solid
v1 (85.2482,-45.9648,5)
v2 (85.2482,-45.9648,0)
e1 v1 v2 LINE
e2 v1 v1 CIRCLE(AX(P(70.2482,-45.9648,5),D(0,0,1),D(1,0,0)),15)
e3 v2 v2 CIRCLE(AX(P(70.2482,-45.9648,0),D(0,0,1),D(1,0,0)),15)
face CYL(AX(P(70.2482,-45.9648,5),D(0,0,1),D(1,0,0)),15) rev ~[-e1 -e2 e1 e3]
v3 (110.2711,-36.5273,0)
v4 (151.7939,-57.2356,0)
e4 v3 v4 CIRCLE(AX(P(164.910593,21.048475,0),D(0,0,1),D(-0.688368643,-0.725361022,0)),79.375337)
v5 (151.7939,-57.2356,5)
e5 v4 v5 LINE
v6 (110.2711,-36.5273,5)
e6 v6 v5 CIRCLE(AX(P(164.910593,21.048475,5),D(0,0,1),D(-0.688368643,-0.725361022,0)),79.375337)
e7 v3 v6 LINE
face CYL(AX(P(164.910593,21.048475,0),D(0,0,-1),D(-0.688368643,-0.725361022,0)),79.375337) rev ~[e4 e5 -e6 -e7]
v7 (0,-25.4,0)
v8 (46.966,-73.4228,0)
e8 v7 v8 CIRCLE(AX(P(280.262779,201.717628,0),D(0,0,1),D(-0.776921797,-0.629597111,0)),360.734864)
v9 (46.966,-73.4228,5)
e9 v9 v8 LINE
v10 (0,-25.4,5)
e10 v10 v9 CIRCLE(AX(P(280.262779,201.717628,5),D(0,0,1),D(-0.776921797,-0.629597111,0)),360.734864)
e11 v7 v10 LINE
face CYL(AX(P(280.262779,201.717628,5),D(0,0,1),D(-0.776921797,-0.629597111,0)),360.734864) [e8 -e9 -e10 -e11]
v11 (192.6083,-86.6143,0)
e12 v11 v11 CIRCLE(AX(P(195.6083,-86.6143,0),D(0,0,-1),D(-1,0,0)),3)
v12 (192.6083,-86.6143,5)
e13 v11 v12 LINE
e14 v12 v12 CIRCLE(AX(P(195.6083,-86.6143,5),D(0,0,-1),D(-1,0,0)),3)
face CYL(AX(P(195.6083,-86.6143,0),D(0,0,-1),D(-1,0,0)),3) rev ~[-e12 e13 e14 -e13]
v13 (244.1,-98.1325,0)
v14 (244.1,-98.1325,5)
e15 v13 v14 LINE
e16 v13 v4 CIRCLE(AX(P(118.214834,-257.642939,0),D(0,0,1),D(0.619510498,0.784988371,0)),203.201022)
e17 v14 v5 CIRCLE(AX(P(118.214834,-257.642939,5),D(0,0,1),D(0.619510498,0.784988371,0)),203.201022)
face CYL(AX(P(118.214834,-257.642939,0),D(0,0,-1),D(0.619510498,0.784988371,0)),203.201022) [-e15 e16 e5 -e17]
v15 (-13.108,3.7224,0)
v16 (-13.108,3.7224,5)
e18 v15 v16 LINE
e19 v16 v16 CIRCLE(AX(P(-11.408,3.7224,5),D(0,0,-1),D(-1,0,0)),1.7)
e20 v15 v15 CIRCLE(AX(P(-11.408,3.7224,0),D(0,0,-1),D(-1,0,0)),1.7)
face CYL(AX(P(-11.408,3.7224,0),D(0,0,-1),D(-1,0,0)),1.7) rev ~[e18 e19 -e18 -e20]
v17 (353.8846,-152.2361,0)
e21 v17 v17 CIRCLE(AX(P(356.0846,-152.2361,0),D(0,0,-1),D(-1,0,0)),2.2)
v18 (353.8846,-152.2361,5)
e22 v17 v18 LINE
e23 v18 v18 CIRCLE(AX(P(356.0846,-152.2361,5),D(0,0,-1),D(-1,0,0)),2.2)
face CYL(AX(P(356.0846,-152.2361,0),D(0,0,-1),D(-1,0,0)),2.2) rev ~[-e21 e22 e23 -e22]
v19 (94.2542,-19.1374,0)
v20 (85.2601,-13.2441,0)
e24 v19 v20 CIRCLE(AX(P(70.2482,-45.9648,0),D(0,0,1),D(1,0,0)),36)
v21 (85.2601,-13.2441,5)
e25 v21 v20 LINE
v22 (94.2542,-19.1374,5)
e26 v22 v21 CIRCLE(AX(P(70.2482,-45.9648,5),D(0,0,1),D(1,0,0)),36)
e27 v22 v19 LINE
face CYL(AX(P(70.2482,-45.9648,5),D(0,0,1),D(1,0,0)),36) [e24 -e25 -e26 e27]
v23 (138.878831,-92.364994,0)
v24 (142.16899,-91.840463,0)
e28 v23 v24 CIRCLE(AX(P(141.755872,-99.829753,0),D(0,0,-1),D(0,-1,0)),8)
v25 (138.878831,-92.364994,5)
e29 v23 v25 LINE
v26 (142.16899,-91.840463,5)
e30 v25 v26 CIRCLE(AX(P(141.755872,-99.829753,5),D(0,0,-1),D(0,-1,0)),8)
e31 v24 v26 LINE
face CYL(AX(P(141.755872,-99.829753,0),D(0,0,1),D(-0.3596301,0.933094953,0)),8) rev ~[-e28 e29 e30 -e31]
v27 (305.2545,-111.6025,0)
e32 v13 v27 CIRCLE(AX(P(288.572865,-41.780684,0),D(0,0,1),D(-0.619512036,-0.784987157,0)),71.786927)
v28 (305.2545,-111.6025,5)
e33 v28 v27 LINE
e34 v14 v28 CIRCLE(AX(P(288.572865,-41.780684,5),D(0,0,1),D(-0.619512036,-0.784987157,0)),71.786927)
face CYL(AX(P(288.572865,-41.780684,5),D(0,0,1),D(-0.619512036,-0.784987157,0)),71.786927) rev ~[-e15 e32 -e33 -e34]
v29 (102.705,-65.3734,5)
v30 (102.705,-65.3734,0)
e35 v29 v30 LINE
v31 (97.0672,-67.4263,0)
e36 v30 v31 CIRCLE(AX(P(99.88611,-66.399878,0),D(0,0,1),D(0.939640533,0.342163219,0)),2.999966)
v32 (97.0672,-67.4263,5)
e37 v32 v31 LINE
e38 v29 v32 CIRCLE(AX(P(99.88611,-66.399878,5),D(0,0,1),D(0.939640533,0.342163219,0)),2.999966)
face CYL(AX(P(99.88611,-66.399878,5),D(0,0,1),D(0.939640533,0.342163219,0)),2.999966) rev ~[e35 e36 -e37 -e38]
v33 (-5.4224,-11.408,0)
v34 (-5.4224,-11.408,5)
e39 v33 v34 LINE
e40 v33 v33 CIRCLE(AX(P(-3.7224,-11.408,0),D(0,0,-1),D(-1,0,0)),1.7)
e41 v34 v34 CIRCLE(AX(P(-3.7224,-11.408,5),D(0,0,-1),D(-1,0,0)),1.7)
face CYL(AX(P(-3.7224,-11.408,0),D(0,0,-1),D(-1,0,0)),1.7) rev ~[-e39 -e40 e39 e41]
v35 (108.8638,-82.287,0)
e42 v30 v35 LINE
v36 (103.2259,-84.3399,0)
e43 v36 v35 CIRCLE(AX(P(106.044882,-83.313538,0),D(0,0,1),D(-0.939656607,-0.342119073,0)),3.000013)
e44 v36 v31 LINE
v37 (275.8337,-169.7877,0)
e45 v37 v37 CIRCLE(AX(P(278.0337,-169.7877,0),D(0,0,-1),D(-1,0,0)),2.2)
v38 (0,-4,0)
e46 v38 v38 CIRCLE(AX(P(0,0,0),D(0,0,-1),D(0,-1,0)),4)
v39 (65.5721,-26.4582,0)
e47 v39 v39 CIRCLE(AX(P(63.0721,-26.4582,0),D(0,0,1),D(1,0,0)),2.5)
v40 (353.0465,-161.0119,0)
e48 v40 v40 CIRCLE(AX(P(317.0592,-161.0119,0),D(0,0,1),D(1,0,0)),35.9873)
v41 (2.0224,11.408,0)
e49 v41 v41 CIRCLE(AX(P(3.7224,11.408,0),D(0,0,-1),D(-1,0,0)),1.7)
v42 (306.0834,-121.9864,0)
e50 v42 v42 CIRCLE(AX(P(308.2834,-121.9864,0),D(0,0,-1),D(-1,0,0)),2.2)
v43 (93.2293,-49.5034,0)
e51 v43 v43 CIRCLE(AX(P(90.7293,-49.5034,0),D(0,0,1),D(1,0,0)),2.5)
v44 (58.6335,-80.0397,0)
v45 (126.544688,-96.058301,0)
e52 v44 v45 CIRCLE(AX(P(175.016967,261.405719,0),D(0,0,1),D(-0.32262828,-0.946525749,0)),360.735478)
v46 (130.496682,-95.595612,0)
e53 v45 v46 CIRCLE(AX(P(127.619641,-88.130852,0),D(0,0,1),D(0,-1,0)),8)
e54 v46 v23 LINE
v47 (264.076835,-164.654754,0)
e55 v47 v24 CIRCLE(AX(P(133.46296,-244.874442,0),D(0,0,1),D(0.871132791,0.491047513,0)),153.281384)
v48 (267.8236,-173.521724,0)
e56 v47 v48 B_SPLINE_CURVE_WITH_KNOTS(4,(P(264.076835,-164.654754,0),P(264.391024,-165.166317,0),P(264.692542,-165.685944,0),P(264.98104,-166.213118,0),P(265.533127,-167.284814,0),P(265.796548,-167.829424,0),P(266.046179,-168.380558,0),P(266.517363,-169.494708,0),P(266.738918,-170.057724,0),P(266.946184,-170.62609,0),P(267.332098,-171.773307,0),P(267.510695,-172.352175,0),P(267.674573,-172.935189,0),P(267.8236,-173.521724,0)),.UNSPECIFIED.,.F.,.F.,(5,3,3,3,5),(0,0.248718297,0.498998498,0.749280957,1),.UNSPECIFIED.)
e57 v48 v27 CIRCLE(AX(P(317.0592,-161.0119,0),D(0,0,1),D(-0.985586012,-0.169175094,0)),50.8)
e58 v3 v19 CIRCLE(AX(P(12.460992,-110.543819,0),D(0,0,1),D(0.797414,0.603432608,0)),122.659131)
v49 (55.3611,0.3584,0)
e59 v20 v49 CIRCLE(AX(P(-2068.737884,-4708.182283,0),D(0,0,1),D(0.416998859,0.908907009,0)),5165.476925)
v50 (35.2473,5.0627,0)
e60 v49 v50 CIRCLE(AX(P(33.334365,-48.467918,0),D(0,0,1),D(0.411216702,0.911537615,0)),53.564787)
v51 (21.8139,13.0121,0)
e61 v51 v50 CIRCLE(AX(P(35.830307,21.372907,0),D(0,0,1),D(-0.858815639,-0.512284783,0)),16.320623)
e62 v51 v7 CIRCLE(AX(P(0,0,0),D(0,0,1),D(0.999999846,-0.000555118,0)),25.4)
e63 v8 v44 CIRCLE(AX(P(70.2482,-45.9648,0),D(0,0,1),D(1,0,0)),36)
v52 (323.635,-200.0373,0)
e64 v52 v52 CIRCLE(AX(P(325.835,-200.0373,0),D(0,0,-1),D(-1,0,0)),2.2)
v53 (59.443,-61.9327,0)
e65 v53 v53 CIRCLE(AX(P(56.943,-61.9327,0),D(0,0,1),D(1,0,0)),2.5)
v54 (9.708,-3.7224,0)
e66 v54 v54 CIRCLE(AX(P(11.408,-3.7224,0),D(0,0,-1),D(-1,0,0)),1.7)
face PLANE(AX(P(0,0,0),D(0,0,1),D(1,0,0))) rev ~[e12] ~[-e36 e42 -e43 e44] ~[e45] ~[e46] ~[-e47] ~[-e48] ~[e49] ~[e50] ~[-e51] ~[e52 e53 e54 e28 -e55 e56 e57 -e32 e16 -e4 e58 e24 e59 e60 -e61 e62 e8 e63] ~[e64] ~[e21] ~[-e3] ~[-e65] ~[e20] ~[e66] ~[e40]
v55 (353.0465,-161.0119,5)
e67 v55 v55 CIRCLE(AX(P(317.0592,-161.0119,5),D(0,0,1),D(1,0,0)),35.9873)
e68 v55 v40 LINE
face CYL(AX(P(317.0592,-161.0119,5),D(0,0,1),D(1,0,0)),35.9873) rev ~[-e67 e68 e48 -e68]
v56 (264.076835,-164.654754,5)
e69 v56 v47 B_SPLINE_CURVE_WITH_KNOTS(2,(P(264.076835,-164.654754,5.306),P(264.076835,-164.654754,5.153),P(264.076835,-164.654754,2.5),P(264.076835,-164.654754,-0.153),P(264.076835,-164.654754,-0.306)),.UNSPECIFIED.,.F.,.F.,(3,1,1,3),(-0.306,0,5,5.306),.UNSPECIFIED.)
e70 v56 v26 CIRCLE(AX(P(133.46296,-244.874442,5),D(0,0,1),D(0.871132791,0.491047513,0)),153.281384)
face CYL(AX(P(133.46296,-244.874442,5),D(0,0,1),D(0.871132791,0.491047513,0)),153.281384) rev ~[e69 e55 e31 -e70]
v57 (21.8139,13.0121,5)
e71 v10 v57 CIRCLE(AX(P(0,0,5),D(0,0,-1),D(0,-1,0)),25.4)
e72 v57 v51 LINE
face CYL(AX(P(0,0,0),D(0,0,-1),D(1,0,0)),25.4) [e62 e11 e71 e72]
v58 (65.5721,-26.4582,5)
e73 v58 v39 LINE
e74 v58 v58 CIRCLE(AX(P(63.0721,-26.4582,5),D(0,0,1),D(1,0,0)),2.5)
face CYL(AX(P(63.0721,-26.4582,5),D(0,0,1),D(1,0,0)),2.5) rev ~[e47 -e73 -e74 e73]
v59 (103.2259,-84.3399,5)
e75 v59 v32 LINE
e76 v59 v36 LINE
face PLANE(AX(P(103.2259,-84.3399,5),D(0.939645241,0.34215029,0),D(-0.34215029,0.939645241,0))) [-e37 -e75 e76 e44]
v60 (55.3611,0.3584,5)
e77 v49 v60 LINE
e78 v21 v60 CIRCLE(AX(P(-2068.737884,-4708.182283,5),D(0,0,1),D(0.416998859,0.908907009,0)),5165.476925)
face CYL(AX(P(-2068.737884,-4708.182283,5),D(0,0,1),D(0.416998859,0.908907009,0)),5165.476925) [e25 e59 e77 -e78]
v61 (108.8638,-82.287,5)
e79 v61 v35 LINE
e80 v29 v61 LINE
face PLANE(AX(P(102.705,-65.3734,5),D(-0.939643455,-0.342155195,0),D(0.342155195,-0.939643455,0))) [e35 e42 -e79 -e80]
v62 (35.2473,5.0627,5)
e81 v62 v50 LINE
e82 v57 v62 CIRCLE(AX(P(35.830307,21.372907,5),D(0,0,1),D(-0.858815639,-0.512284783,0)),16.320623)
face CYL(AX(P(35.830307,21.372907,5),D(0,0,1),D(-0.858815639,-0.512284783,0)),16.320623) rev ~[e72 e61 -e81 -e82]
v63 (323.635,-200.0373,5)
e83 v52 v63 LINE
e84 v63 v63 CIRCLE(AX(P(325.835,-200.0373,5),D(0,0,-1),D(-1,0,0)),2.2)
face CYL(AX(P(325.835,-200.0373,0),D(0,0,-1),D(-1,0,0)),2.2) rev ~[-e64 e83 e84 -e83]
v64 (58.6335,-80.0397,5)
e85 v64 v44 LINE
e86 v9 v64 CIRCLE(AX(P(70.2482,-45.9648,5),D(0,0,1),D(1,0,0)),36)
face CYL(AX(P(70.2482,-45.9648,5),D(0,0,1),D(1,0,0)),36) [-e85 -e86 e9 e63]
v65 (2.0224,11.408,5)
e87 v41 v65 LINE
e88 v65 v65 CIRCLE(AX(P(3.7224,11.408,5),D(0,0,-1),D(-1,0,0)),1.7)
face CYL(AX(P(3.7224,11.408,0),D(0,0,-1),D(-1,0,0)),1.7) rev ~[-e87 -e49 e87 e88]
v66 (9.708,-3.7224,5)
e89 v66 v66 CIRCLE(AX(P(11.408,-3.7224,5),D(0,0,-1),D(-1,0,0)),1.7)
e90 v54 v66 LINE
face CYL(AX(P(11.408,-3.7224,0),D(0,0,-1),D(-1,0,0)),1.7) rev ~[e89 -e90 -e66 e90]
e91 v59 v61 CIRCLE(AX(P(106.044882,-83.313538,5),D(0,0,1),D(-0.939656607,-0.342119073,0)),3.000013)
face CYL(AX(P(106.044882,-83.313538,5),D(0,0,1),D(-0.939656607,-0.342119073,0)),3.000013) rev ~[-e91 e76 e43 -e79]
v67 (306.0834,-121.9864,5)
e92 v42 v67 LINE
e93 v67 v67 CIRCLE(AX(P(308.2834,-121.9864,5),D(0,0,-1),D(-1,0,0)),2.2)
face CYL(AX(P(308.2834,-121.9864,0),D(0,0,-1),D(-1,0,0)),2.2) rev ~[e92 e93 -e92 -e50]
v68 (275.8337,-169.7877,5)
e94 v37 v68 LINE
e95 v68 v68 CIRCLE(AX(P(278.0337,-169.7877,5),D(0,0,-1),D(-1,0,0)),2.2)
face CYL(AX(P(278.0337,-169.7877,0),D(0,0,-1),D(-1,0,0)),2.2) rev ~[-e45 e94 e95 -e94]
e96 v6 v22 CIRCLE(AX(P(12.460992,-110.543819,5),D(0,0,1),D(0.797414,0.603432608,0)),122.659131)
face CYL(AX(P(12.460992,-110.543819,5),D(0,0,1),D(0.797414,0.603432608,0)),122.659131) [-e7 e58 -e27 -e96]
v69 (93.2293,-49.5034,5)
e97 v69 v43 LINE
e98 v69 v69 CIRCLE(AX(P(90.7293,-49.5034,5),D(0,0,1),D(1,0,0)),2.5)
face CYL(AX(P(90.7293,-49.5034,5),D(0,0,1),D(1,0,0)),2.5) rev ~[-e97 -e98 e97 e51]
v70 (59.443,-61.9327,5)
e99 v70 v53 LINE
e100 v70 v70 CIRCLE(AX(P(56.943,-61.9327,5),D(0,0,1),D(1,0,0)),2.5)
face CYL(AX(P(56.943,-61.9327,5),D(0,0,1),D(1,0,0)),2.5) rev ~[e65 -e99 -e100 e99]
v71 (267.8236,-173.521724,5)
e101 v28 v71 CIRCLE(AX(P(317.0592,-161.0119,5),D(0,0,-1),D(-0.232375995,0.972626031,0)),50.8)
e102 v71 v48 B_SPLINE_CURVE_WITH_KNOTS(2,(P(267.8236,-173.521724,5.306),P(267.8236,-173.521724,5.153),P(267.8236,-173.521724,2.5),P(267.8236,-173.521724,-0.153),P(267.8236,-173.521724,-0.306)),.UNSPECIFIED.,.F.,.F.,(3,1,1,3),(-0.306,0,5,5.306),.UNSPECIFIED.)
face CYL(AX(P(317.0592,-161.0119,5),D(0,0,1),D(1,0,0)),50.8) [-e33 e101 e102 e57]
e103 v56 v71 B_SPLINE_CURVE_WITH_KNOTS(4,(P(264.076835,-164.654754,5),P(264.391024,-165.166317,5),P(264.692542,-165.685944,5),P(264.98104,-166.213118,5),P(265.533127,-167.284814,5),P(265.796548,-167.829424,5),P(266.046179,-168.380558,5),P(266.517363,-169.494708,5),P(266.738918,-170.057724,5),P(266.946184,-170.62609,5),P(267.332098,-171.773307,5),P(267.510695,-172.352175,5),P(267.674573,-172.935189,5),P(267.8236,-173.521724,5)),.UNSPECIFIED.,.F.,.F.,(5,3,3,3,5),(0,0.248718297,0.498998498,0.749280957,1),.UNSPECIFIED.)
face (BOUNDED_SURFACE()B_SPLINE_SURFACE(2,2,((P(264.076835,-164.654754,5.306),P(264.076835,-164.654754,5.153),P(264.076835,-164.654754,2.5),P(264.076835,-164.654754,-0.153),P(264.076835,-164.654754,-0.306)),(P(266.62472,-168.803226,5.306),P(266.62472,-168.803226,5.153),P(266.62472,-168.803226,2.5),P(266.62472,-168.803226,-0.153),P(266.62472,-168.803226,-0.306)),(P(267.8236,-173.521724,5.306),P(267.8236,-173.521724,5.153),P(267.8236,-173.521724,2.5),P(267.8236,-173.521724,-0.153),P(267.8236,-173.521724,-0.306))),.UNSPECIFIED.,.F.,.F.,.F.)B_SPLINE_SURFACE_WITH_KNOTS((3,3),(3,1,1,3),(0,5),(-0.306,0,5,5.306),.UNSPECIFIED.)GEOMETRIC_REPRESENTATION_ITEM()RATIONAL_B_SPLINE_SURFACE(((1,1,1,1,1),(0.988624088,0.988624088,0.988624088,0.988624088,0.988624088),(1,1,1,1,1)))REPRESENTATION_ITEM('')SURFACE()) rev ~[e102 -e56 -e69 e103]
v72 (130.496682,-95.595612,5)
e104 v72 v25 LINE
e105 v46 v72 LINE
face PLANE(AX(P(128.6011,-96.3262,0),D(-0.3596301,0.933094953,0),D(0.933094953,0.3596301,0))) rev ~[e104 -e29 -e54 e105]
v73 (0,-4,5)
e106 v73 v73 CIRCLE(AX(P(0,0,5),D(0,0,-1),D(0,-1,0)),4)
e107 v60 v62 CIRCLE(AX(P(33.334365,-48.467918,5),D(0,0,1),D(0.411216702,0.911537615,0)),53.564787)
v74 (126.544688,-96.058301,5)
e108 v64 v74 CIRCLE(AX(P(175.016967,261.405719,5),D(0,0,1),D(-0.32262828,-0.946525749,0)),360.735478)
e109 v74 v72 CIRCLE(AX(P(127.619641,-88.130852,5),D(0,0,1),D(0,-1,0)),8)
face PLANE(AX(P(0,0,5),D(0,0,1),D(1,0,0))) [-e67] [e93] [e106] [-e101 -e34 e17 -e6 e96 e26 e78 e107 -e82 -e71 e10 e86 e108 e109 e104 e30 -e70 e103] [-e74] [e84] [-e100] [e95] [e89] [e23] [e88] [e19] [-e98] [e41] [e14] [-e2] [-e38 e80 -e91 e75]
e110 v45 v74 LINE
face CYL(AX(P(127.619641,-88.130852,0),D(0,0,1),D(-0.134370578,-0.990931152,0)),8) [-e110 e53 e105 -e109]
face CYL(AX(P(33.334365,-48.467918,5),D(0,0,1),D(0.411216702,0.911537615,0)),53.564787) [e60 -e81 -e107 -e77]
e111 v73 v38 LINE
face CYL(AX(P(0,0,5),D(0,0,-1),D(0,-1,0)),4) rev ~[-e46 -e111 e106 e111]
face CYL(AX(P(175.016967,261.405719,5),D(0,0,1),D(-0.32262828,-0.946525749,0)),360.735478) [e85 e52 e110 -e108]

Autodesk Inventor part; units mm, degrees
ref_plane "YZ Plane" through (0, 0, 0) normal (1, 0, 0) x (0, 1, 0)
ref_plane "XZ Plane" through (0, 0, 0) normal (0, 1, 0) x (-1, 0, 0)
ref_plane "XY Plane" through (0, 0, 0) normal (0, 0, 1) x (1, 0, 0)
sketch "Base" plane through (0, 0, 0) normal (0, 0, 1) x (1, 0, 0)
  circle A0 centre (0, 0) radius 25.4
  arc A1 (296.4611, -175.8738) -> (140.4514, -91.7589) centre (131.6761, -294.7694) ccw
  arc A2 (110.2711, -36.5273) -> (55.3611, 0.3584) centre (-26.1088, -180.2356) ccw
  arc A3 (110.2711, -36.5273) -> (151.7939, -57.2356) centre (164.9104, 21.0482) ccw
  arc A4 (244.1, -98.1325) -> (151.7939, -57.2356) centre (118.2154, -257.642) ccw
  arc A5 (244.1, -98.1325) -> (322.9398, -136.302) centre (369.9847, 61.3771) ccw
  arc A6 (339.7063, -172.5127) -> (322.9398, -136.302) centre (317.0592, -161.0119) ccw
  arc A7 (296.4611, -175.8738) -> (339.7063, -172.5127) centre (317.0592, -161.0119) ccw
  line L0 (128.6011, -96.3262) -> (140.4514, -91.7589)
  line L1 (0, 0) -> (317.0592, -161.0119) construction
  circle A8 centre (317.0592, -161.0119) radius 25.4 construction
  arc A9 (0, -25.4) -> (128.6011, -96.3262) centre (153.166, 100.265) ccw
  line L2 (0, 0) -> (0, -25.4) construction
  arc A10 (55.3611, 0.3584) -> (42.3326, -1.2004) centre (50.1387, -11.2181) ccw
  arc A11 (25.4, -0.0141) -> (42.3326, -1.2004) centre (34.5266, 8.8174) ccw
  line L3 (110.2711, -36.5273) -> (102.4101, -52.0068) construction
  line L4 (50.1387, -11.2181) -> (44.3883, -22.5417) construction
  line L5 (140.4514, -91.7589) -> (148.7008, -75.5146) construction
  line L6 (244.1, -98.1325) -> (233.6726, -118.6658) construction
  line L7 (339.7063, -172.5127) -> (317.0592, -161.0119) construction
  dimension "d101" = 50.8
  dimension "d98" = 355.6
  dimension "d99" = 203.2
  dimension "d100" = 79.375
  dimension "d102" = 198.12
  dimension "d103" = 50.8
  dimension "d104" = 12.7
  dimension "d105" = 203.2
  dimension "d106" = 48
  dimension "d107" = 12.7
  dimension "d108" = 12.7
  dimension "d109" = 23.495
  dimension "d111" = 158.75
  dimension "d112" = 222.25
  dimension "d113" = 49.784
  dimension "d114" = 65.0748
  dimension "d115" = 51.9176
  dimension "d116" = 95.3008
  dimension "d117" = 93.5228
extrude "Plate1" add sketch "Base" along normal blind 5
sketch "MountHoles" plane through (0, 0, 5) normal (0, 0, 1) x (1, 0, 0)
  arc A0 (296.4611, -175.8738) -> (322.9398, -136.302) centre (317.0592, -161.0119) ccw projected
  circle A1 centre (317.0592, -161.0119) radius 3.175
  circle A2 centre (0, 0) radius 3.175
  circle A3 centre (0, 0) radius 15.875 construction
  circle A4 centre (0, 15.875) radius 3.175
  line L0 (0, 15.875) -> (0, 0) construction
  circle A5 centre (-13.7482, 7.9375) radius 3.175
  circle A6 centre (-13.7482, -7.9375) radius 3.175
  circle A7 centre (0, -15.875) radius 3.175
  circle A8 centre (13.7482, -7.9375) radius 3.175
  circle A9 centre (13.7482, 7.9375) radius 3.175
  point P0 (278.6053, -195.7416)
  point P1 (14.9365, 6.9557)
  dimension "d40" = 31.75
  dimension "d38" = 6.35
  dimension "d39" = 6.35
  dimension "d43" = 360
hole "MountHolesFeature" at (0, 0, 5) direction (0, 0, -1) diameter 8 end through all
fillet "SmallFilletsFeature" radius 8 2 edges at (140.4514, -91.7589, 2.5) (128.6011, -96.3262, 2.5)
sketch "WheelMountHole" plane through (0, 0, 5) normal (0, 0, 1) x (1, 0, 0)
  arc A0 (296.4611, -175.8738) -> (322.9398, -136.302) centre (317.0592, -161.0119) ccw projected
  circle A1 centre (317.0592, -161.0119) radius 6.35
  point P0 (0, 0)
  point P1 (278.6053, -195.7416)
  dimension "d83" = 12.7
hole "WheelMountHoleFeature" at (317.0592, -161.0119, 5) direction (0, 0, -1) diameter 24.5 end through all
sketch "PistonMountHole" plane through (0, 0, 0) normal (0, 0, -1) x (-1, 0, 0)
  circle A0 centre (-195.6083, -86.6143) radius 3
  arc A1 (-151.7939, -57.2356) -> (-244.1, -98.1325) centre (-118.2154, -257.642) ccw projected
  line L0 (-206.4619, -74.6043) -> (-184.7548, -98.6243) construction
  arc A2 (-142.169, -91.8405) -> (-296.4611, -175.8738) centre (-131.6761, -294.7694) ccw projected
  point P0 (0, 0)
  dimension "d120" = 6
  dimension "d122" = 203.2
  dimension "d197" = 77.3929
extrude "PistonMountHoleFeature" cut sketch "PistonMountHole" against normal blind 5
sketch "MotorExtend" plane through (0, 0, 5) normal (0, 0, 1) x (1, 0, 0)
  circle A0 centre (70.2482, -45.9648) radius 36
  arc A1 (0, -25.4) -> (126.5447, -96.0583) centre (153.166, 100.265) ccw construction
  arc A2 (110.2711, -36.5273) -> (151.7939, -57.2356) centre (164.9104, 21.0482) ccw construction
  circle A3 centre (0, 0) radius 4
  line L0 (0, 0) -> (140.4963, -91.9296) construction
  arc A4 (142.169, -91.8405) -> (138.8789, -92.365) centre (141.7559, -99.8298) ccw
  arc A5 (0, -25.4) -> (46.966, -73.4228) centre (280.2614, 201.7164) ccw
  arc A6 (126.5447, -96.0583) -> (130.4966, -95.5956) centre (127.6196, -88.1308) ccw
  arc A7 (58.6335, -80.0397) -> (126.5447, -96.0583) centre (175.0163, 261.4034) ccw
  arc A8 (55.3611, 0.3584) -> (42.3326, -1.2004) centre (50.1387, -11.2181) ccw
  arc A9 (85.2601, -13.2441) -> (55.3611, 0.3584) centre (-2070.8473, -4712.7994) ccw
  arc A10 (110.2711, -36.5273) -> (55.3611, 0.3584) centre (-26.1088, -180.2356) ccw
  arc A11 (110.2711, -36.5273) -> (94.2542, -19.1374) centre (12.4591, -110.5454) ccw
  line L1 (0, -25.4) -> (55.3611, 0.3584)
  line L2 (110.2711, -36.5273) -> (126.5447, -96.0583)
  point P0 (70.2482, -45.9648)
  dimension "d128" = 72
sheet face with bend "MotorExtendFeature" sketch "MotorExtend" thickness 5 toward (0, 0, -1) bend radius 5 contours A0 A10 | A11 A10 A0 | A0 A10 A9 | A10 L2 A7 A0 | A0 A10 | A0 A5 L1 A10
bend "Bend1"
sketch "MotorCut" plane through (0, 0, 5) normal (0, 0, 1) x (1, 0, 0)
  circle A0 centre (70.2482, -45.9648) radius 36 projected
  circle A1 centre (70.2482, -45.9648) radius 15
  point P0 (0, 0)
  dimension "d134" = 30
extrude "MotorCutFeature" cut sketch "MotorCut" against normal blind 5 contours A1
sketch "MotorMountHoles" plane through (0, 0, 5) normal (0, 0, 1) x (1, 0, 0)
  circle A0 centre (56.943, -61.9327) radius 3.5 construction
  circle A1 centre (63.0721, -26.4582) radius 3.5 construction
  circle A2 centre (90.7293, -49.5034) radius 3.5 construction
  circle A3 centre (63.0721, -26.4582) radius 2.5
  circle A4 centre (90.7293, -49.5034) radius 2.5
  circle A5 centre (56.943, -61.9327) radius 2.5
  point P0 (0, 0)
  dimension "d180" = 5
extrude "MotorMountHolesFeature" cut sketch "MotorMountHoles" against normal blind 5
sketch "HubCoverExtend" plane through (0, 0, 5) normal (0, 0, 1) x (1, 0, 0)
  circle A0 centre (317.0592, -161.0119) radius 12.25
  circle A1 centre (317.0592, -161.0119) radius 50.8
  arc A2 (244.1, -98.1325) -> (322.9398, -136.302) centre (369.9847, 61.3771) ccw
  arc A3 (296.4611, -175.8738) -> (142.169, -91.8405) centre (131.6761, -294.7694) ccw
  arc A4 (244.1, -98.1325) -> (305.2545, -111.6025) centre (288.573, -41.7804) ccw
  arc A5 (266.9914, -169.606) -> (228.8665, -116.3198) centre (192.9202, -182.3202) ccw
  point P0 (0, 0)
  point P1 (283.7795, -122.6308)
  point P2 (268.8853, -144.8899)
  dimension "d139" = 101.6
sheet face with bend "HubCoverExtendFeature" sketch "HubCoverExtend" thickness 5 toward (0, 0, -1) bend radius 5
bend "Bend2"
sketch "HubPressFitHole" plane through (0, 0, 5) normal (0, 0, 1) x (1, 0, 0)
  circle A0 centre (317.0592, -161.0119) radius 12.25 projected
  circle A1 centre (317.0592, -161.0119) radius 35.9873
  point P0 (0, 0)
  dimension "d145" = 71.9746
extrude "HubPressFitHoleFeature" cut sketch "HubPressFitHole" against normal blind 5 contours A0 | A1
sketch "ShinThicken" plane through (0, 0, 5) normal (0, 0, 1) x (1, 0, 0)
  arc A0 (266.9914, -169.606) -> (228.8665, -116.3198) centre (192.9202, -182.3202) ccw
  arc A1 (228.8665, -116.3198) -> (142.169, -91.8405) centre (131.6761, -294.7694) ccw
  arc A2 (266.9914, -169.606) -> (142.169, -91.8405) centre (133.4629, -244.8745) ccw
  point P0 (0, 0)
sheet face with bend "ShinThickenFeature" sketch "ShinThicken" thickness 5 toward (0, 0, -1) bend radius 5
bend "Bend3"
fillet "BlendFilletFeature" radius 32 1 edges at (266.9914, -169.606, 2.5)
sketch "MotorMountExtension" plane through (0, 0, 5) normal (0, 0, 1) x (1, 0, 0)
  arc A0 (55.3611, 0.3584) -> (42.3326, -1.2004) centre (50.1387, -11.2181) ccw
  arc A1 (55.3611, 0.3584) -> (35.2473, 5.0627) centre (33.3341, -48.4687) ccw
  arc A2 (25.4, -0.0141) -> (0, -25.4) centre (0, 0) ccw
  arc A3 (21.8139, 13.0121) -> (35.2473, 5.0627) centre (35.8302, 21.3728) ccw
  arc A4 (85.2601, -13.2441) -> (55.3611, 0.3584) centre (-2070.8473, -4712.7994) ccw
  arc A5 (25.4, -0.0141) -> (42.3326, -1.2004) centre (34.5266, 8.8174) ccw
sheet face with bend "MotorMountExtensionFeature" sketch "MotorMountExtension" thickness 5 toward (0, 0, -1) bend radius 5
bend "Bend4"
sketch "HubMountHoles" plane through (0, 0, 0) normal (0, 0, -1) x (-1, 0, 0)
  circle A0 centre (3.7224, -11.408) radius 2 construction
  circle A1 centre (11.408, 3.7224) radius 2 construction
  circle A2 centre (-11.408, -3.7224) radius 2 construction
  circle A3 centre (-3.7224, 11.408) radius 2 construction
  circle A4 centre (-3.7224, 11.408) radius 1.7
  circle A5 centre (-11.408, -3.7224) radius 1.7
  circle A6 centre (3.7224, -11.408) radius 1.7
  circle A7 centre (11.408, 3.7224) radius 1.7
  point P0 (0, 0)
  dimension "d190" = 4
  dimension "d191" = 3.4
  dimension "d192" = 3.4
  dimension "d193" = 3.4
  dimension "d194" = 3.4
extrude "HubMountHolesFeature" cut sketch "HubMountHoles" against normal blind 5
sketch "EncoderMountHoles" plane through (0, 0, 0) normal (0, 0, -1) x (-1, 0, 0)
  circle A0 centre (-278.0337, -169.7877) radius 2.2 projected
  circle A1 centre (-308.2834, -121.9864) radius 2.2 projected
  circle A2 centre (-356.0846, -152.2361) radius 2.2 projected
  circle A3 centre (-325.835, -200.0373) radius 2.2 projected
  point P0 (0, 0)
extrude "EncoderMountHolesFeature" cut sketch "EncoderMountHoles" against normal blind 5
sketch "RollerGuideHole" plane through (0, 0, 5) normal (0, 0, 1) x (1, 0, 0)
  line L0 (99.8861, -66.3999) -> (106.0449, -83.3135) construction
  line L1 (102.705, -65.3734) -> (108.8638, -82.287)
  line L2 (103.2259, -84.3399) -> (97.0672, -67.4263)
  arc A0 (102.705, -65.3734) -> (97.0672, -67.4263) centre (99.8861, -66.3999) ccw
  arc A1 (103.2259, -84.3399) -> (108.8638, -82.287) centre (106.0449, -83.3135) ccw
  arc A2 (126.5447, -96.0583) -> (130.4966, -95.5956) centre (127.6196, -88.1308) ccw projected
  circle A3 centre (70.2482, -45.9648) radius 15 projected
  circle A4 centre (0, 0) radius 4 projected
  line L3 (0, 0) -> (70.2482, -45.9648) construction
  circle A5 centre (317.0592, -161.0119) radius 35.9873 projected
  line L4 (317.0592, -161.0119) -> (70.2482, -45.9648) construction
  point P0 (102.9655, -74.8567)
  point P1 (128.5499, -96.0766)
  dimension "d200" = 3
  dimension "d205" = 18
  dimension "d206" = 45
  dimension "d207" = 6
  dimension "d208" = 36
extrude "RollerGuideHoleFeature" cut sketch "RollerGuideHole" against normal blind 5 contours L1 A1 L2 A0
equation "\"d66\" = Thickness"
equation "\"d89\" = Thickness"
equation "\"d37\" = Thickness"
equation "\"BendRadius\" = Thickness"
equation "\"BendReliefWidth\" = Thickness"
equation "\"BendReliefDepth\" = 0.5 * Thickness"
equation "\"TransitionRadius\" = BendRadius"
equation "\"JacobiRadiusSize\" = BendRadius"
equation "\"GapSize\" = Thickness"
equation "\"Thickness\" = 5"
properties part number "LowerLeg"
